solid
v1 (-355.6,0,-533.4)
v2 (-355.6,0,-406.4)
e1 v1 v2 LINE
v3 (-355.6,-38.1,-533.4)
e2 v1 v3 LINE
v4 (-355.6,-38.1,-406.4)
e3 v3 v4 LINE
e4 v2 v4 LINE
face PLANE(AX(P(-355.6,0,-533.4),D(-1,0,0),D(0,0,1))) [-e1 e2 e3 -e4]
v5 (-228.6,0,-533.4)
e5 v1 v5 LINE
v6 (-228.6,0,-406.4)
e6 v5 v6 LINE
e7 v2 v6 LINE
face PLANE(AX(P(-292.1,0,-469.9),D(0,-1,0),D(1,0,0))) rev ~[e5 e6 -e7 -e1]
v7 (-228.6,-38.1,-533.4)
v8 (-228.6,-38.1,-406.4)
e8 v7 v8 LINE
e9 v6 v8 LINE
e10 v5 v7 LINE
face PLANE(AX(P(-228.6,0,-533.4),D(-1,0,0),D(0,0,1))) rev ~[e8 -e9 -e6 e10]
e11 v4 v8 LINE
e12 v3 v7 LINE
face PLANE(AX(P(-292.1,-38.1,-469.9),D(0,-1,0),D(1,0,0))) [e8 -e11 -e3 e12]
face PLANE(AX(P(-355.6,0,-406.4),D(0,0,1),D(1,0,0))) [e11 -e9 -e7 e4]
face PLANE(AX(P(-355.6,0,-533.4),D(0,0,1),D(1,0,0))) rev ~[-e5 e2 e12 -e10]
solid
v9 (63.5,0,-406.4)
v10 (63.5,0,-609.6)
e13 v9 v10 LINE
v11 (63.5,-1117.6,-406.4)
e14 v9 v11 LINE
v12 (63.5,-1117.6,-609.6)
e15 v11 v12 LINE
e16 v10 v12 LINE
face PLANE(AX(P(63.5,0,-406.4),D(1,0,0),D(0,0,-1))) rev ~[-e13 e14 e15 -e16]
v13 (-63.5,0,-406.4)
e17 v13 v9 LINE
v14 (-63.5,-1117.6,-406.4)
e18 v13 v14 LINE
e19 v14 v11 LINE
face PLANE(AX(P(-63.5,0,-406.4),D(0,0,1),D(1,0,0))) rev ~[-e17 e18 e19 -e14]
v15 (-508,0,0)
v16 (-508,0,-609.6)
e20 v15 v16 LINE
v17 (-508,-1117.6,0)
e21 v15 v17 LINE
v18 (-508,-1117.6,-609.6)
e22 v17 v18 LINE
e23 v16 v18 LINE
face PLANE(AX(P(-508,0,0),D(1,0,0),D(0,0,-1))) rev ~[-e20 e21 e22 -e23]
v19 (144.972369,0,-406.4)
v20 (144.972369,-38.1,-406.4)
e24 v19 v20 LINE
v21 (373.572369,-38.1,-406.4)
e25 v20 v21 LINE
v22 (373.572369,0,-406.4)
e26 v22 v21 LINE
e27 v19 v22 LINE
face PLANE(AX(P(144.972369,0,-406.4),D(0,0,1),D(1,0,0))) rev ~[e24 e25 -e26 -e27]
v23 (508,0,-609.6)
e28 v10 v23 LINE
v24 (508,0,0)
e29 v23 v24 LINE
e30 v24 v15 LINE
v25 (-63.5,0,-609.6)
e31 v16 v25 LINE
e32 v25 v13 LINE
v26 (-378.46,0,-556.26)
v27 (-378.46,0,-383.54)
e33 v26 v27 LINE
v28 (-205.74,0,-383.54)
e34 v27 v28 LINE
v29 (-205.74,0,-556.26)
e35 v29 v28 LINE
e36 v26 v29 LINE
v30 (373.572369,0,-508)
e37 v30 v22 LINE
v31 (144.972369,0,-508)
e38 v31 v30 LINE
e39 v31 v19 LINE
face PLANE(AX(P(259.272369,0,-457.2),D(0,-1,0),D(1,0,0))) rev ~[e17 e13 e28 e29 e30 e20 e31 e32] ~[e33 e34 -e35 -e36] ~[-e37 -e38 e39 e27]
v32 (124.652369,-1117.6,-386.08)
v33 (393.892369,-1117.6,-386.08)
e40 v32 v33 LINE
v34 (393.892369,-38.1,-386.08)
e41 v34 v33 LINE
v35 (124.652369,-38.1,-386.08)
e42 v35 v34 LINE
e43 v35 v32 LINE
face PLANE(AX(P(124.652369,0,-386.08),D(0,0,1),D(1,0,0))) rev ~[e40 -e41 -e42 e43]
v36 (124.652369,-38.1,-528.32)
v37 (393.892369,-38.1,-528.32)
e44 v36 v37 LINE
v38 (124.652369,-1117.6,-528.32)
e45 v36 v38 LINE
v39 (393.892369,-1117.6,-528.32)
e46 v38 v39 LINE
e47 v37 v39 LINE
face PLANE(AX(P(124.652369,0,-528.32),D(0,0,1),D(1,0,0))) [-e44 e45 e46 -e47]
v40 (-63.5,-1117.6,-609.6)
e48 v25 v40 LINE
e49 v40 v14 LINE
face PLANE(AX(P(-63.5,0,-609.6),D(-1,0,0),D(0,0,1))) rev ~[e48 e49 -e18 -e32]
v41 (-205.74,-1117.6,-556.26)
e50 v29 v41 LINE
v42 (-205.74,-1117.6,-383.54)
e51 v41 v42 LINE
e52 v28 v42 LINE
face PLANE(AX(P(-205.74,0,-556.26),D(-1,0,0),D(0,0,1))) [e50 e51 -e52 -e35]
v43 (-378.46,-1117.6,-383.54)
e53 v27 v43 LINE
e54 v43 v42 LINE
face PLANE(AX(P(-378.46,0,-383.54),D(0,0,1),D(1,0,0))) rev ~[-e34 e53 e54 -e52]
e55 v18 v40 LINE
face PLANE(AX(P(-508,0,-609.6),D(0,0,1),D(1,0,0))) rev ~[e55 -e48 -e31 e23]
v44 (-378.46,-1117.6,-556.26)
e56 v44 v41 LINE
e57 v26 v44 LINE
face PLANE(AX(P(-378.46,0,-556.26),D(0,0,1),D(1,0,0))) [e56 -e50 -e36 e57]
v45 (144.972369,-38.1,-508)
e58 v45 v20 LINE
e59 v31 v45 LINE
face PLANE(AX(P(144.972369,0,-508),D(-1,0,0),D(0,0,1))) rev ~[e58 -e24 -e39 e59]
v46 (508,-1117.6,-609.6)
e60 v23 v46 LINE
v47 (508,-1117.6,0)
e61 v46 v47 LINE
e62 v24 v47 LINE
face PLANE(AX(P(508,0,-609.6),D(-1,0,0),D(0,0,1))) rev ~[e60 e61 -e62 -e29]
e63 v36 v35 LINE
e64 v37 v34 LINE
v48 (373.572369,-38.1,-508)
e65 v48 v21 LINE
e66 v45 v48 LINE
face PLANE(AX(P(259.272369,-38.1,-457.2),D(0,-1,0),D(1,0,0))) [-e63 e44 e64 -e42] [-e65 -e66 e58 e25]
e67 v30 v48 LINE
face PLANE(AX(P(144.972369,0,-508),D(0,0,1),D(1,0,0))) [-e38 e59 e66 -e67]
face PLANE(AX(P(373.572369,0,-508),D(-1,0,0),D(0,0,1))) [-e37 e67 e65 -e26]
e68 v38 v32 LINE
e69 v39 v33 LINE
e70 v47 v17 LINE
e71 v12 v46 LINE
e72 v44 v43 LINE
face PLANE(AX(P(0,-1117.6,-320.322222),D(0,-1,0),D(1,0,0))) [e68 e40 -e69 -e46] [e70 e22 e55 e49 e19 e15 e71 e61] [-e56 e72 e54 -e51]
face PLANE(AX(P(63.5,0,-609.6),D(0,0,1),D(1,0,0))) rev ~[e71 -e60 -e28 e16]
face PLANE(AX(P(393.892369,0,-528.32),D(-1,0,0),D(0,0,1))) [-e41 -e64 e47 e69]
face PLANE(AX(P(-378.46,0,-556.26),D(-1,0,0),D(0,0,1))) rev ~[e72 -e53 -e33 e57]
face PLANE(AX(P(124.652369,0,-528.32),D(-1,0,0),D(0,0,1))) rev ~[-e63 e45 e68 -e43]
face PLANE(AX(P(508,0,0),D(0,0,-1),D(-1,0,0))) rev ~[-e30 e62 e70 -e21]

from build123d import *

# Parameters (mm, degrees)
F0_W     = 172.72
F0_H     = 172.72
F0_W_2   = 269.24
F0_H_2   = 142.24
F2_DEPTH = 1117.6
F0_W_3   = 228.6
F0_H_3   = 101.6
F3_DEPTH = 38.1
F0_W_4   = 127
F0_H_4   = 127


# Not quite as in the source:
# - the program builds the solid bodies; features that only make, move or delete a surface that nothing else refers to are left out


with BuildPart() as f2:
    # F0 (on Front) → F2 (new body)
    with BuildSketch(Plane.XZ):
        Polygon((508, 0), (0, 0), (-508, 0), (-508, -609.6), (-67.5734877586, -609.6), (-63.5, -609.6), (-63.5, -406.4), (63.5, -406.4), (63.5, -609.6), (508, -609.6), align=None)
        with Locations((-292.1, -469.9)):
            Rectangle(F0_W, F0_H, mode=Mode.SUBTRACT)
        with Locations((259.2723690559, -457.2)):
            Rectangle(F0_W_2, F0_H_2, mode=Mode.SUBTRACT)
    extrude(amount=F2_DEPTH)

    # F0 (on Front) → F3 (join)
    with BuildSketch(Plane.XZ):
        with Locations((259.2723690559, -457.2)):
            Rectangle(F0_W_2, F0_H_2)
        with Locations((259.2723690559, -457.2)):
            Rectangle(F0_W_3, F0_H_3, mode=Mode.SUBTRACT)
    extrude(amount=F3_DEPTH)


with BuildPart() as f3:
    # F0 (on Front) → F3, piece 2 (new body)
    with BuildSketch(Plane.XZ):
        with Locations((-292.1, -469.9)):
            Rectangle(F0_W_4, F0_H_4)
    extrude(amount=F3_DEPTH)


solid = Compound([f2.part, f3.part])
